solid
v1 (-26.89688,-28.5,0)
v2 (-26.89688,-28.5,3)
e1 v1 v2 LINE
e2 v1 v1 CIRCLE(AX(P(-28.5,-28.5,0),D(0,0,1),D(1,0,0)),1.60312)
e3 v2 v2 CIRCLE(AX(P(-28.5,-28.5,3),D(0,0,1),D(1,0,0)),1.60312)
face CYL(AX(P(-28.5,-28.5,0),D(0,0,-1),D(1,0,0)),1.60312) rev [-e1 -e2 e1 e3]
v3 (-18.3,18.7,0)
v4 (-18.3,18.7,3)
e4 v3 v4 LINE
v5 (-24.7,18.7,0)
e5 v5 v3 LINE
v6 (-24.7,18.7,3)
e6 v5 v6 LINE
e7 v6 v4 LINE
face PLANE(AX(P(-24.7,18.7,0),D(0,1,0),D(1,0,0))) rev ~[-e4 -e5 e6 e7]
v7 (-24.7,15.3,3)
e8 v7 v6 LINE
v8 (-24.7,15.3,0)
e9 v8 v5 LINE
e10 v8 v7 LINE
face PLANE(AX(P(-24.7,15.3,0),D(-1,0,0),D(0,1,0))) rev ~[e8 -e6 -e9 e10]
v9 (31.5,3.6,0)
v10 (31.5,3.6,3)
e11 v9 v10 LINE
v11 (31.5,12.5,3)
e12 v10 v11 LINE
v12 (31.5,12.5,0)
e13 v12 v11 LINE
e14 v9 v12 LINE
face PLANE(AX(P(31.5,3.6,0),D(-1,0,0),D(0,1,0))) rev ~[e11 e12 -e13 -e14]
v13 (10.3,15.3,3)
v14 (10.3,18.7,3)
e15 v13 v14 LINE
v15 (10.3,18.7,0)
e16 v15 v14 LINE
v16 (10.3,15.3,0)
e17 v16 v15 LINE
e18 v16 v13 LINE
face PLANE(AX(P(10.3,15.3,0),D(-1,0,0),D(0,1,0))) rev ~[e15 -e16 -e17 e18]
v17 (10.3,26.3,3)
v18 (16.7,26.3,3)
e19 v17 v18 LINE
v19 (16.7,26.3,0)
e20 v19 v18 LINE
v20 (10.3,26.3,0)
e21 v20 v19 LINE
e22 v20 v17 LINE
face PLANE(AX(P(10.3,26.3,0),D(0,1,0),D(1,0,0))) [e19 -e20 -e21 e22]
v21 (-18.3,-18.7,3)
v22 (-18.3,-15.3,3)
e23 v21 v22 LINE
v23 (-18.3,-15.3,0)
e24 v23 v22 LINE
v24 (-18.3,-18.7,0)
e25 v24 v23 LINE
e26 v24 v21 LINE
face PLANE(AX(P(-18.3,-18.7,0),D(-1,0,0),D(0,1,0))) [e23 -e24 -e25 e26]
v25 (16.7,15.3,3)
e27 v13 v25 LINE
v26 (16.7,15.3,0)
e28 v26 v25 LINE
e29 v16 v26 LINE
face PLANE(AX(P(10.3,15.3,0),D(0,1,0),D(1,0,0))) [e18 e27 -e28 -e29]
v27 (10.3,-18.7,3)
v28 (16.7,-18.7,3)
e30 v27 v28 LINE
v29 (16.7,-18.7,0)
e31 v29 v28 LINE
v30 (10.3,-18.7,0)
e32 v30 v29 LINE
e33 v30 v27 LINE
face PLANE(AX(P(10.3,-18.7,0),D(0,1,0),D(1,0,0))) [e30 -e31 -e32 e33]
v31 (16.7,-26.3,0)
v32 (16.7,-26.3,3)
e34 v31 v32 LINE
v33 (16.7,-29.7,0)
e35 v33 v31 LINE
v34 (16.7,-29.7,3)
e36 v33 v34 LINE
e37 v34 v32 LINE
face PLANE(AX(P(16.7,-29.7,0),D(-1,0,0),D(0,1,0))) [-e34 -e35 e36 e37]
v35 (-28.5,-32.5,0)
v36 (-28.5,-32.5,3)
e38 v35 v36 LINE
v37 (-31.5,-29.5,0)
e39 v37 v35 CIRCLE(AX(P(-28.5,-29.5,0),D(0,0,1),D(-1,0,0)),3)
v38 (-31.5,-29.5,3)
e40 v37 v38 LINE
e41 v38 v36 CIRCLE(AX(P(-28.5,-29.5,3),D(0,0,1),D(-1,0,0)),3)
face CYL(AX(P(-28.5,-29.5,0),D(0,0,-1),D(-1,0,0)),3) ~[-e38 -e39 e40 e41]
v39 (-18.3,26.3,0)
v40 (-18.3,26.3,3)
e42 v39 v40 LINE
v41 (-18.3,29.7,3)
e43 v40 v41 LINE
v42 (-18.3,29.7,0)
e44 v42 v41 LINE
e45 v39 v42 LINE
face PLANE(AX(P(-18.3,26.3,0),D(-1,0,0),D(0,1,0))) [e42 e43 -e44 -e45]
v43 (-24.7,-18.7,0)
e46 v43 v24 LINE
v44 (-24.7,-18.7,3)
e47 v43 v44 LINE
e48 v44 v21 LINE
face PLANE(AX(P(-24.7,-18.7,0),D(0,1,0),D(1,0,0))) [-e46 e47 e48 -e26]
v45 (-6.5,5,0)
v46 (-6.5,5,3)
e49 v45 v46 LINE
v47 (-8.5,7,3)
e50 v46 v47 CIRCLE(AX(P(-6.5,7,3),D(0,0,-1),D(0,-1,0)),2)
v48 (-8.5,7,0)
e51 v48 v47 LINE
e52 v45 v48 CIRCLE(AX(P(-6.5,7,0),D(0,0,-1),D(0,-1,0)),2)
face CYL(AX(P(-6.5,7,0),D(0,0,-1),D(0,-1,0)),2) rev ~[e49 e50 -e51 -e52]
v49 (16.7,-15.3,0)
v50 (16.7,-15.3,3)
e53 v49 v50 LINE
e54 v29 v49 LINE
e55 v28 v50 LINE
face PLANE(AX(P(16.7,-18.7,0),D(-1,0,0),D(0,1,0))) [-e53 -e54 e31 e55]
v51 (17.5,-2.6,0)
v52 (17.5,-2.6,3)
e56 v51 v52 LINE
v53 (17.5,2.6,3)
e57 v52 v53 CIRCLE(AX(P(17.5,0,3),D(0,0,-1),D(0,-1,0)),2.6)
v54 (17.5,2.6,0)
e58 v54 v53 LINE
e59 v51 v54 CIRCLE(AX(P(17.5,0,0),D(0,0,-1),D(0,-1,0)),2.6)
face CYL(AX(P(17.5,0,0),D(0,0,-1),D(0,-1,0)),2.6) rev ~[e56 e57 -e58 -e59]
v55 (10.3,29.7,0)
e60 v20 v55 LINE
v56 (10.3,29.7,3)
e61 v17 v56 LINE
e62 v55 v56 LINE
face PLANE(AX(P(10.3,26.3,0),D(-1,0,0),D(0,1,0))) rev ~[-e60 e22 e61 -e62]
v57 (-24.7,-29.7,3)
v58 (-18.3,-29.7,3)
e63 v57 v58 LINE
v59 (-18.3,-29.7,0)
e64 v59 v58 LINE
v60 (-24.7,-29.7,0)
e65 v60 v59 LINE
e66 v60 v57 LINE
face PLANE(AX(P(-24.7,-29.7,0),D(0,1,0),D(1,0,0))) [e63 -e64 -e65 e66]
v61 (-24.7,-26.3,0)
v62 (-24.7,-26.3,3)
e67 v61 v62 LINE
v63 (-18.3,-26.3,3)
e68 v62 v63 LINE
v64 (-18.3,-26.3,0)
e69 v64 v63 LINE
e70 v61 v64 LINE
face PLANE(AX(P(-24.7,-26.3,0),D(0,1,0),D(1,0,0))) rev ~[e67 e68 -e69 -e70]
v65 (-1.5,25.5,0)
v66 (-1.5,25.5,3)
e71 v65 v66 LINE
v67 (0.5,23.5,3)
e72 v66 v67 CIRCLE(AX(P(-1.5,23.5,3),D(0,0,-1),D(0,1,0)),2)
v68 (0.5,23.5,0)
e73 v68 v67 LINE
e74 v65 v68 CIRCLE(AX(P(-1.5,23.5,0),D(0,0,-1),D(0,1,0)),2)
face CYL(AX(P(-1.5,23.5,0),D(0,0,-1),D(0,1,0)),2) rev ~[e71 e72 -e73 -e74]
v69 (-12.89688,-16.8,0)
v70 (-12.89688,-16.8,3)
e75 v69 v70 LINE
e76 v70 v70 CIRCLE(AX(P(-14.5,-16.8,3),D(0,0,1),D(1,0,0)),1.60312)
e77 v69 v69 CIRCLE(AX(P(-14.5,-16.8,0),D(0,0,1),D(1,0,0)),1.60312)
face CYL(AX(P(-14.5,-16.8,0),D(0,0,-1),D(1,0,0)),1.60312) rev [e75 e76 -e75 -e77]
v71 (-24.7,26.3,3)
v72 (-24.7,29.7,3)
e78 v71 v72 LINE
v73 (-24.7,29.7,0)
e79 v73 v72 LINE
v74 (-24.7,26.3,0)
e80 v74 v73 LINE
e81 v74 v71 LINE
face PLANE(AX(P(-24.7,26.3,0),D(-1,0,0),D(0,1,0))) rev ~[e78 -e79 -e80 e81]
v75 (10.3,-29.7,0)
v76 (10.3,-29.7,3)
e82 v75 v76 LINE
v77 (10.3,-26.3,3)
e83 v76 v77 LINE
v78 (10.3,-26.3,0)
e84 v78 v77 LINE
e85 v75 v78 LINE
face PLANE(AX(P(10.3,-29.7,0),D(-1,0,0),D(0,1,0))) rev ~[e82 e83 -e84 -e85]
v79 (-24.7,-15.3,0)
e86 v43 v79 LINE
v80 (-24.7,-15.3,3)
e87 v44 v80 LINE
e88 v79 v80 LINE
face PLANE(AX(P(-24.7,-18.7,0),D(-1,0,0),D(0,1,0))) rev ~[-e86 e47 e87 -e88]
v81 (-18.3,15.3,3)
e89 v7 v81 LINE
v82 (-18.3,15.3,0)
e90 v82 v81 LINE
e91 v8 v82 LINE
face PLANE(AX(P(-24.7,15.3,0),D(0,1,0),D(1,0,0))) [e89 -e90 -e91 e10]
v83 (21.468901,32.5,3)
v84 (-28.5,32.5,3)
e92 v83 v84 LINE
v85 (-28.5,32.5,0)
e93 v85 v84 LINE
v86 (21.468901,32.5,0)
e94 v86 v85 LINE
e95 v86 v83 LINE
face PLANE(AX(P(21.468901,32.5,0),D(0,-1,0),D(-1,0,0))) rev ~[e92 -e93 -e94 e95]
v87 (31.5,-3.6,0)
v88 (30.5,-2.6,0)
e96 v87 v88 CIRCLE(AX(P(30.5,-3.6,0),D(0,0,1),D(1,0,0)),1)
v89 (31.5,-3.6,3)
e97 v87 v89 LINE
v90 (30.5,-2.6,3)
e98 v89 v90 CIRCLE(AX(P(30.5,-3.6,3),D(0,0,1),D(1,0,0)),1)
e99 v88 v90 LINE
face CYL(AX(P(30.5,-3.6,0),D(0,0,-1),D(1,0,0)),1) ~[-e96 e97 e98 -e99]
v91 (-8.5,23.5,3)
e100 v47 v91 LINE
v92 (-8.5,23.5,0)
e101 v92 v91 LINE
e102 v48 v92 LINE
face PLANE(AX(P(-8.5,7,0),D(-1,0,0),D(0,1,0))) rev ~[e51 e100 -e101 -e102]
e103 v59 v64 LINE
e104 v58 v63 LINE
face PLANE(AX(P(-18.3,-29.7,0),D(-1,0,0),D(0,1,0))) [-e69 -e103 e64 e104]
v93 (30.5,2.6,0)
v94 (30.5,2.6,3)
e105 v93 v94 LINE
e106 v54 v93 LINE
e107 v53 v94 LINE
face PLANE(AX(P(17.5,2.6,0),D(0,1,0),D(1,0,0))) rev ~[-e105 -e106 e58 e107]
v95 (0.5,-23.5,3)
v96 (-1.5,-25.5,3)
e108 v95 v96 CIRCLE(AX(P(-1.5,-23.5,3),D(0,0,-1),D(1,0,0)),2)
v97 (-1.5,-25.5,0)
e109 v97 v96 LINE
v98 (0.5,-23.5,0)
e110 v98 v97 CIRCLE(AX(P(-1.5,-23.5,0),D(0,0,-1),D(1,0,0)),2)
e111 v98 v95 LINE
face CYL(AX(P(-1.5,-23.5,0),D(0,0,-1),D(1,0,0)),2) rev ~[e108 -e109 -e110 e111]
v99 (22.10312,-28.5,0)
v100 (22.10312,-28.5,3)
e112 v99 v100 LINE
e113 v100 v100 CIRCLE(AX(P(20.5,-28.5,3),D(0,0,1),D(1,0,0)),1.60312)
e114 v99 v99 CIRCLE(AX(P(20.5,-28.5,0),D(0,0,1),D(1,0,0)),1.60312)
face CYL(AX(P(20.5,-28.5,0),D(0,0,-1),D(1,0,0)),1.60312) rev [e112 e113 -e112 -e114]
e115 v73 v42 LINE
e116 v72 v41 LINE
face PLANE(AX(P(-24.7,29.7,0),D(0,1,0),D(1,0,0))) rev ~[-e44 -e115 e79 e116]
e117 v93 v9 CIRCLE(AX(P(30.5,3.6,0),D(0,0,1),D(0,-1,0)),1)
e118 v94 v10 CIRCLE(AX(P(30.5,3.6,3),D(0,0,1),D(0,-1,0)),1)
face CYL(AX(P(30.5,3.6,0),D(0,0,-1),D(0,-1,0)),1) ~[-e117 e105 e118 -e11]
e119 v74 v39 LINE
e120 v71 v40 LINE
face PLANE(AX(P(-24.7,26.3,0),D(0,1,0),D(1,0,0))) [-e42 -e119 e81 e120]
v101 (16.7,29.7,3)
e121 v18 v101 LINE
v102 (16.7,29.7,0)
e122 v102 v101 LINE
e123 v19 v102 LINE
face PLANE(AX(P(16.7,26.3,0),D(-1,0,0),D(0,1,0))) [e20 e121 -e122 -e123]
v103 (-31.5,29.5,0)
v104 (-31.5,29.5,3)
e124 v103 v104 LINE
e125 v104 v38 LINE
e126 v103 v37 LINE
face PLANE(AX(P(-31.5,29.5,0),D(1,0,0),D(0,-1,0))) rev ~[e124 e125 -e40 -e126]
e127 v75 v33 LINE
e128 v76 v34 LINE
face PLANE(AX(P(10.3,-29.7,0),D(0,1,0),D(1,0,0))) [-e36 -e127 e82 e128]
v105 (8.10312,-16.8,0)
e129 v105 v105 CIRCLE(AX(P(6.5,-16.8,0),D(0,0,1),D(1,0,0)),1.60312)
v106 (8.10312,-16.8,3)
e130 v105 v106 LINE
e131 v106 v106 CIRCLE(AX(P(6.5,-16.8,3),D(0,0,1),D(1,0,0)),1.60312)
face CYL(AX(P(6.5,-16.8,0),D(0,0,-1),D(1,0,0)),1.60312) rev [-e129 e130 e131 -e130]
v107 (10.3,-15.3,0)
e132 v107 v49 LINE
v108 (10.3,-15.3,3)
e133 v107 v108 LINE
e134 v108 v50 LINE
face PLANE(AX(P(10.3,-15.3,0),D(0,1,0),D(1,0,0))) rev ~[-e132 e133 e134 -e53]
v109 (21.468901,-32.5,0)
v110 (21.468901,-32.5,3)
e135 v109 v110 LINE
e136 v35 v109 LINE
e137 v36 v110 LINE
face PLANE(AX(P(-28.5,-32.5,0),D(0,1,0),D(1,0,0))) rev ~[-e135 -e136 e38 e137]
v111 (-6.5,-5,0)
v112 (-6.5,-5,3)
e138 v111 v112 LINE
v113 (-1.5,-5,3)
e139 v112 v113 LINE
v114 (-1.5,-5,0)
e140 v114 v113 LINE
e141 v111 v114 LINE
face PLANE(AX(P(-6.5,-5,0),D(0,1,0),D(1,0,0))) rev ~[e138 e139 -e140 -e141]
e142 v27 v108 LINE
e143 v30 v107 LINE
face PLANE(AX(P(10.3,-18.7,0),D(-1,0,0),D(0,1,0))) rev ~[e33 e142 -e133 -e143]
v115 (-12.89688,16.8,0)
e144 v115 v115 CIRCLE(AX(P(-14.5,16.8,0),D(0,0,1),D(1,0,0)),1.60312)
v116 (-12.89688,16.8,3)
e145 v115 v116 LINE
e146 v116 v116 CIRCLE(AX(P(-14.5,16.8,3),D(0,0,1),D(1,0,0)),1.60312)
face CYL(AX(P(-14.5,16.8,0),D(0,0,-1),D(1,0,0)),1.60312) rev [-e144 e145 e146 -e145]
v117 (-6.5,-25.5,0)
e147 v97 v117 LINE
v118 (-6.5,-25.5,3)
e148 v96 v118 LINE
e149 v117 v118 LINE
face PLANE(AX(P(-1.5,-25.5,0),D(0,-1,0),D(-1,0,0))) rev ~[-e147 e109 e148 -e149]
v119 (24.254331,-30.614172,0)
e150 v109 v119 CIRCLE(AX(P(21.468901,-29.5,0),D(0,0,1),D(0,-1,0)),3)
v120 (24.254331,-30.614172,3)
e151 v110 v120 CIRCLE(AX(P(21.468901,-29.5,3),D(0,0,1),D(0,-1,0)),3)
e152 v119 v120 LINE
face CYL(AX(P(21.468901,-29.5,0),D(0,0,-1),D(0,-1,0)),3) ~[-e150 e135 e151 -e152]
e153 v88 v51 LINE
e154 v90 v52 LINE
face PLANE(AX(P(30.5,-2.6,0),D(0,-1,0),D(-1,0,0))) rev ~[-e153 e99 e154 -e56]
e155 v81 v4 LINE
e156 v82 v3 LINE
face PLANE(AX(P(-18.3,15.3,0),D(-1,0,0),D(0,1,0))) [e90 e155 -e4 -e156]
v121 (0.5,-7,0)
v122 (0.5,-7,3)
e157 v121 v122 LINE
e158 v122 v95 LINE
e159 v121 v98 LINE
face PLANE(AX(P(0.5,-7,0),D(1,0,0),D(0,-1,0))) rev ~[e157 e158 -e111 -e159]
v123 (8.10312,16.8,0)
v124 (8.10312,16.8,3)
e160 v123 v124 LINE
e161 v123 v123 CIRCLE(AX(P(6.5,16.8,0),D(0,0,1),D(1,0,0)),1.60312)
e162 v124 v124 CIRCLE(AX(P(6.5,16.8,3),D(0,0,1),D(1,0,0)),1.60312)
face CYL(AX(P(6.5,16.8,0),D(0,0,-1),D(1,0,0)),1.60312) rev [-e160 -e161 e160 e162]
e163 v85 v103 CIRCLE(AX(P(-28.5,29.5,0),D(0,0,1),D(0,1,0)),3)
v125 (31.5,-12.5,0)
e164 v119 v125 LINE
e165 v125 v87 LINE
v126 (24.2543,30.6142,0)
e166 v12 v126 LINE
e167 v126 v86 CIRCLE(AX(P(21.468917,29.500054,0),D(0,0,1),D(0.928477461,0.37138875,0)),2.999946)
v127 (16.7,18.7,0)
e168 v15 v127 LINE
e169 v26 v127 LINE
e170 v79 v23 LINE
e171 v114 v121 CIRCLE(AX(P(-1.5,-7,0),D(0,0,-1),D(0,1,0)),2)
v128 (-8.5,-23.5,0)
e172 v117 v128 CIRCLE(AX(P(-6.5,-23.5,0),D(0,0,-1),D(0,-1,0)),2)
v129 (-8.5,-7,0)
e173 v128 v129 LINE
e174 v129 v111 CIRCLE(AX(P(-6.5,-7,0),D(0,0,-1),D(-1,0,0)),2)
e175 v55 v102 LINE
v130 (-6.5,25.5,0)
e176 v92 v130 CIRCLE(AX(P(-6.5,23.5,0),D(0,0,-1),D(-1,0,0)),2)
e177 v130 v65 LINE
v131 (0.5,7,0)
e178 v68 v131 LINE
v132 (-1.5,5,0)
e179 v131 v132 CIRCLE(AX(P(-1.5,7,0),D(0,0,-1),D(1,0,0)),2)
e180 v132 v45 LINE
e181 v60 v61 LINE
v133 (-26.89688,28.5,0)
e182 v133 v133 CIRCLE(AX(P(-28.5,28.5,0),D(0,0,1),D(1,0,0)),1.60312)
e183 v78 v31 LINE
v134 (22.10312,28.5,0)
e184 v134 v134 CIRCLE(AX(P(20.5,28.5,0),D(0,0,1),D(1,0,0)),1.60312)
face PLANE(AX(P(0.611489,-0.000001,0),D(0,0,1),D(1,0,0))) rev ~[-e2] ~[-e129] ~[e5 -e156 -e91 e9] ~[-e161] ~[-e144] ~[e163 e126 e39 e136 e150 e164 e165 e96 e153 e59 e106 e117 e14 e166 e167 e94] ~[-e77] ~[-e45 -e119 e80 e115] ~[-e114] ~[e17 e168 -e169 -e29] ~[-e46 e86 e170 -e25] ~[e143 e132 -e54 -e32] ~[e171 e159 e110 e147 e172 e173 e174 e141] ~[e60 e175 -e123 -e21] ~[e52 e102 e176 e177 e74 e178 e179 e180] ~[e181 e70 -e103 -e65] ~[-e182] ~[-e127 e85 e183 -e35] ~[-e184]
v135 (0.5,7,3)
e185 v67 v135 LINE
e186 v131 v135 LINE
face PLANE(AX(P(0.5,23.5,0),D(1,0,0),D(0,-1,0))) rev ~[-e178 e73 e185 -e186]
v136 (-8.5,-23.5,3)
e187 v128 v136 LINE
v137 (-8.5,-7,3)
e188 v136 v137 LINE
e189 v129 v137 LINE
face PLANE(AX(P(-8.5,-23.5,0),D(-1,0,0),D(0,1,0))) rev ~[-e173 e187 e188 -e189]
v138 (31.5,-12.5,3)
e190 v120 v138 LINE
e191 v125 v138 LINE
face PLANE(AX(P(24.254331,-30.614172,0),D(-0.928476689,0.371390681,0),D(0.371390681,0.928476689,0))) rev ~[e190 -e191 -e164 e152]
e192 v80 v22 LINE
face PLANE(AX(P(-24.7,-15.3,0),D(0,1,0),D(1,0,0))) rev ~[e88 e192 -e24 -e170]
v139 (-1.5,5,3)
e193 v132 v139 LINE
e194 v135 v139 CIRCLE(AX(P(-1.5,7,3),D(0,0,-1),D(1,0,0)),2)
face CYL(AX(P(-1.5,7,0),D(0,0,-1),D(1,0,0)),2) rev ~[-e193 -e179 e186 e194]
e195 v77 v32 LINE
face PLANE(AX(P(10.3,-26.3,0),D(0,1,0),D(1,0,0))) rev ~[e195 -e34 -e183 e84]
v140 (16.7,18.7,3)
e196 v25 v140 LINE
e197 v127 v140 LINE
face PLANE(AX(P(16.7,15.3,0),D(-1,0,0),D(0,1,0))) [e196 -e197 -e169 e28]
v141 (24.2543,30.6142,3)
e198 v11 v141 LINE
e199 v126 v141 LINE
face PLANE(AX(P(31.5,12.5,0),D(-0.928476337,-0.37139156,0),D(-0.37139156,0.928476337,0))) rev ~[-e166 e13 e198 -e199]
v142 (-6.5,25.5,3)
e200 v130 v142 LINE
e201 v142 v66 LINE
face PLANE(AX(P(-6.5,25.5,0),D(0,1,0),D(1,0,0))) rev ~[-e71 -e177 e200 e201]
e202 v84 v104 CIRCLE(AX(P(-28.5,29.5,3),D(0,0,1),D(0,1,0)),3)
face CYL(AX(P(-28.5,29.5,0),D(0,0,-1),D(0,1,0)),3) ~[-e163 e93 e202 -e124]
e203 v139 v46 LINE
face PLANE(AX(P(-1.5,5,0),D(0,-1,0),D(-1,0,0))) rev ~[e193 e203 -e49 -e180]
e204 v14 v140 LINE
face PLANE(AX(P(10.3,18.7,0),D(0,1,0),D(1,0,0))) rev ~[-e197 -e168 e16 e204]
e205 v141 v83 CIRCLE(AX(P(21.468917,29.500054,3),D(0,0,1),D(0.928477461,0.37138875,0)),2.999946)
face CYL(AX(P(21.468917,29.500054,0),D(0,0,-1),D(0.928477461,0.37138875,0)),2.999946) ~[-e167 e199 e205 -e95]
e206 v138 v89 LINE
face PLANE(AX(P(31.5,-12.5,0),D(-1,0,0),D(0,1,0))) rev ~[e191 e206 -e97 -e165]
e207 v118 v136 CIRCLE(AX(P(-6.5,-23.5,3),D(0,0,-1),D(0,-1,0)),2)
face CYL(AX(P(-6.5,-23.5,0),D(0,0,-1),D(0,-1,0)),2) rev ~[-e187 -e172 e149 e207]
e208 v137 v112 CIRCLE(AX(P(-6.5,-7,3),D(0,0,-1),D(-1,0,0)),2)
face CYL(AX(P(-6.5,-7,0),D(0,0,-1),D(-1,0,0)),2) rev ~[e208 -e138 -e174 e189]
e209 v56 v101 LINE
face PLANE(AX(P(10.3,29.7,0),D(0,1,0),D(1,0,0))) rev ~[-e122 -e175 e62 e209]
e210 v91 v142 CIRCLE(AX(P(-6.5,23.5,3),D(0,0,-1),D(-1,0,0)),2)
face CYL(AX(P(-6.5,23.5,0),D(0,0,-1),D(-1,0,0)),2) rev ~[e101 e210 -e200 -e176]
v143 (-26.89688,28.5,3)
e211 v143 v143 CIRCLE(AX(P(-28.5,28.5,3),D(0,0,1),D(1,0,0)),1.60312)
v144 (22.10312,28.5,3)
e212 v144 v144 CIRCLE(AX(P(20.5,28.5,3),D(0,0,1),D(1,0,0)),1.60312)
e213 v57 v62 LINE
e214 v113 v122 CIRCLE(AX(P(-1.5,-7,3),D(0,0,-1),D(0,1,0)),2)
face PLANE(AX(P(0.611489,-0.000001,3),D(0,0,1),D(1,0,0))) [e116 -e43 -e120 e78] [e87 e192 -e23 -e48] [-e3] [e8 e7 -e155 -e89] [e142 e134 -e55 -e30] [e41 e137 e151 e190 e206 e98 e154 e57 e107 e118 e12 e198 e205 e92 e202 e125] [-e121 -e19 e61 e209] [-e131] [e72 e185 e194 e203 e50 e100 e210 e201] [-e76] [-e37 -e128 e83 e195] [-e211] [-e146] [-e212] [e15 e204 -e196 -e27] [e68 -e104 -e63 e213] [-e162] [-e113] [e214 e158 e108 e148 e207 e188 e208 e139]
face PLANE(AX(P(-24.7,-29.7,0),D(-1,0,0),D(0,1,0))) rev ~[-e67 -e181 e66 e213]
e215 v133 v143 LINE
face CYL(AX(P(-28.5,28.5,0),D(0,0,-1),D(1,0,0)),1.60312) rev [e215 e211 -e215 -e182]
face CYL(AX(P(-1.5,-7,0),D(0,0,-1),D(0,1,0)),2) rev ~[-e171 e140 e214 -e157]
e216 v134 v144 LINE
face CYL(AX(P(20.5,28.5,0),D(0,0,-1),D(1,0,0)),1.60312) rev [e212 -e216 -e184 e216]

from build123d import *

# Parameters (mm, degrees)
F0_R     = 1.60312
F0_W     = 6.4
F0_H     = 3.4
F1_DEPTH = 3


# Not quite as in the source:
# - ends of sketch curves that miss each other by under 0.0002 mm in the source are joined


with BuildPart() as f1:
    # F0 (on Top) → F1 (new body)
    with BuildSketch(Plane.XY):
        with BuildLine():
            ThreePointArc((17.5, -2.6), (14.9, 0), (17.5, 2.6))
            Line((17.5, 2.6), (30.5, 2.6))
            ThreePointArc((30.5, 2.6), (31.2071067812, 2.8928932188), (31.5, 3.6))
            Line((31.5, 3.6), (31.5, 12.5))
            Line((31.5, 12.5), (24.2543, 30.6142))
            ThreePointArc((24.2543, 30.6142), (23.1507874279, 31.9842016914), (21.468901, 32.5))
            Line((21.468901, 32.5), (-28.5, 32.5))
            ThreePointArc((-28.5, 32.5), (-30.6213203436, 31.6213203436), (-31.5, 29.5))
            Line((-31.5, 29.5), (-31.5, -29.5))
            ThreePointArc((-31.5, -29.5), (-30.6213203436, -31.6213203436), (-28.5, -32.5))
            Line((-28.5, -32.5), (21.468901, -32.5))
            ThreePointArc((21.468901, -32.5), (23.1507874279, -31.9842016914), (24.2543310727, -30.6141720291))
            Line((24.2543310727, -30.6141720291), (31.5, -12.5))
            Line((31.5, -12.5), (31.5, -3.6))
            ThreePointArc((31.5, -3.6), (31.2071067812, -2.8928932188), (30.5, -2.6))
            Line((30.5, -2.6), (17.5, -2.6))
        make_face()
        with Locations((-28.5, -28.5)):
            Circle(F0_R, mode=Mode.SUBTRACT)
        with Locations((-21.5, -28)):
            Rectangle(F0_W, F0_H, mode=Mode.SUBTRACT)
        with Locations((-21.5, -17)):
            Rectangle(F0_W, F0_H, mode=Mode.SUBTRACT)
        with Locations((-14.5, -16.8)):
            Circle(F0_R, mode=Mode.SUBTRACT)
        with BuildLine():
            ThreePointArc((0.5, -23.5), (-0.0857864376, -24.9142135624), (-1.5, -25.5))
            Line((-1.5, -25.5), (-6.5, -25.5))
            ThreePointArc((-6.5, -25.5), (-7.9142135624, -24.9142135624), (-8.5, -23.5))
            Line((-8.5, -23.5), (-8.5, -7))
            ThreePointArc((-8.5, -7), (-7.9142135624, -5.5857864376), (-6.5, -5))
            Line((-6.5, -5), (-1.5, -5))
            ThreePointArc((-1.5, -5), (-0.0857864376, -5.5857864376), (0.5, -7))
            Line((0.5, -7), (0.5, -23.5))
        make_face(mode=Mode.SUBTRACT)
        with Locations((13.5, -28)):
            Rectangle(F0_W, F0_H, mode=Mode.SUBTRACT)
        with Locations((6.5, -16.8)):
            Circle(F0_R, mode=Mode.SUBTRACT)
        with Locations((13.5, -17)):
            Rectangle(F0_W, F0_H, mode=Mode.SUBTRACT)
        with Locations((20.5, -28.5)):
            Circle(F0_R, mode=Mode.SUBTRACT)
        with BuildLine():
            ThreePointArc((-1.5, 25.5), (-0.0857864376, 24.9142135624), (0.5, 23.5))
            Line((0.5, 23.5), (0.5, 7))
            ThreePointArc((0.5, 7), (-0.0857864376, 5.5857864376), (-1.5, 5))
            Line((-1.5, 5), (-6.5, 5))
            ThreePointArc((-6.5, 5), (-7.9142135624, 5.5857864376), (-8.5, 7))
            Line((-8.5, 7), (-8.5, 23.5))
            ThreePointArc((-8.5, 23.5), (-7.9142135624, 24.9142135624), (-6.5, 25.5))
            Line((-6.5, 25.5), (-1.5, 25.5))
        make_face(mode=Mode.SUBTRACT)
        with Locations((-21.5, 17)):
            Rectangle(F0_W, F0_H, mode=Mode.SUBTRACT)
        with Locations((-28.5, 28.5)):
            Circle(F0_R, mode=Mode.SUBTRACT)
        with Locations((-21.5, 28)):
            Rectangle(F0_W, F0_H, mode=Mode.SUBTRACT)
        with Locations((-14.5, 16.8)):
            Circle(F0_R, mode=Mode.SUBTRACT)
        with Locations((6.5, 16.8)):
            Circle(F0_R, mode=Mode.SUBTRACT)
        with Locations((13.5, 17)):
            Rectangle(F0_W, F0_H, mode=Mode.SUBTRACT)
        with Locations((13.5, 28)):
            Rectangle(F0_W, F0_H, mode=Mode.SUBTRACT)
        with Locations((20.5, 28.5)):
            Circle(F0_R, mode=Mode.SUBTRACT)
    extrude(amount=F1_DEPTH)


solid = f1.part
